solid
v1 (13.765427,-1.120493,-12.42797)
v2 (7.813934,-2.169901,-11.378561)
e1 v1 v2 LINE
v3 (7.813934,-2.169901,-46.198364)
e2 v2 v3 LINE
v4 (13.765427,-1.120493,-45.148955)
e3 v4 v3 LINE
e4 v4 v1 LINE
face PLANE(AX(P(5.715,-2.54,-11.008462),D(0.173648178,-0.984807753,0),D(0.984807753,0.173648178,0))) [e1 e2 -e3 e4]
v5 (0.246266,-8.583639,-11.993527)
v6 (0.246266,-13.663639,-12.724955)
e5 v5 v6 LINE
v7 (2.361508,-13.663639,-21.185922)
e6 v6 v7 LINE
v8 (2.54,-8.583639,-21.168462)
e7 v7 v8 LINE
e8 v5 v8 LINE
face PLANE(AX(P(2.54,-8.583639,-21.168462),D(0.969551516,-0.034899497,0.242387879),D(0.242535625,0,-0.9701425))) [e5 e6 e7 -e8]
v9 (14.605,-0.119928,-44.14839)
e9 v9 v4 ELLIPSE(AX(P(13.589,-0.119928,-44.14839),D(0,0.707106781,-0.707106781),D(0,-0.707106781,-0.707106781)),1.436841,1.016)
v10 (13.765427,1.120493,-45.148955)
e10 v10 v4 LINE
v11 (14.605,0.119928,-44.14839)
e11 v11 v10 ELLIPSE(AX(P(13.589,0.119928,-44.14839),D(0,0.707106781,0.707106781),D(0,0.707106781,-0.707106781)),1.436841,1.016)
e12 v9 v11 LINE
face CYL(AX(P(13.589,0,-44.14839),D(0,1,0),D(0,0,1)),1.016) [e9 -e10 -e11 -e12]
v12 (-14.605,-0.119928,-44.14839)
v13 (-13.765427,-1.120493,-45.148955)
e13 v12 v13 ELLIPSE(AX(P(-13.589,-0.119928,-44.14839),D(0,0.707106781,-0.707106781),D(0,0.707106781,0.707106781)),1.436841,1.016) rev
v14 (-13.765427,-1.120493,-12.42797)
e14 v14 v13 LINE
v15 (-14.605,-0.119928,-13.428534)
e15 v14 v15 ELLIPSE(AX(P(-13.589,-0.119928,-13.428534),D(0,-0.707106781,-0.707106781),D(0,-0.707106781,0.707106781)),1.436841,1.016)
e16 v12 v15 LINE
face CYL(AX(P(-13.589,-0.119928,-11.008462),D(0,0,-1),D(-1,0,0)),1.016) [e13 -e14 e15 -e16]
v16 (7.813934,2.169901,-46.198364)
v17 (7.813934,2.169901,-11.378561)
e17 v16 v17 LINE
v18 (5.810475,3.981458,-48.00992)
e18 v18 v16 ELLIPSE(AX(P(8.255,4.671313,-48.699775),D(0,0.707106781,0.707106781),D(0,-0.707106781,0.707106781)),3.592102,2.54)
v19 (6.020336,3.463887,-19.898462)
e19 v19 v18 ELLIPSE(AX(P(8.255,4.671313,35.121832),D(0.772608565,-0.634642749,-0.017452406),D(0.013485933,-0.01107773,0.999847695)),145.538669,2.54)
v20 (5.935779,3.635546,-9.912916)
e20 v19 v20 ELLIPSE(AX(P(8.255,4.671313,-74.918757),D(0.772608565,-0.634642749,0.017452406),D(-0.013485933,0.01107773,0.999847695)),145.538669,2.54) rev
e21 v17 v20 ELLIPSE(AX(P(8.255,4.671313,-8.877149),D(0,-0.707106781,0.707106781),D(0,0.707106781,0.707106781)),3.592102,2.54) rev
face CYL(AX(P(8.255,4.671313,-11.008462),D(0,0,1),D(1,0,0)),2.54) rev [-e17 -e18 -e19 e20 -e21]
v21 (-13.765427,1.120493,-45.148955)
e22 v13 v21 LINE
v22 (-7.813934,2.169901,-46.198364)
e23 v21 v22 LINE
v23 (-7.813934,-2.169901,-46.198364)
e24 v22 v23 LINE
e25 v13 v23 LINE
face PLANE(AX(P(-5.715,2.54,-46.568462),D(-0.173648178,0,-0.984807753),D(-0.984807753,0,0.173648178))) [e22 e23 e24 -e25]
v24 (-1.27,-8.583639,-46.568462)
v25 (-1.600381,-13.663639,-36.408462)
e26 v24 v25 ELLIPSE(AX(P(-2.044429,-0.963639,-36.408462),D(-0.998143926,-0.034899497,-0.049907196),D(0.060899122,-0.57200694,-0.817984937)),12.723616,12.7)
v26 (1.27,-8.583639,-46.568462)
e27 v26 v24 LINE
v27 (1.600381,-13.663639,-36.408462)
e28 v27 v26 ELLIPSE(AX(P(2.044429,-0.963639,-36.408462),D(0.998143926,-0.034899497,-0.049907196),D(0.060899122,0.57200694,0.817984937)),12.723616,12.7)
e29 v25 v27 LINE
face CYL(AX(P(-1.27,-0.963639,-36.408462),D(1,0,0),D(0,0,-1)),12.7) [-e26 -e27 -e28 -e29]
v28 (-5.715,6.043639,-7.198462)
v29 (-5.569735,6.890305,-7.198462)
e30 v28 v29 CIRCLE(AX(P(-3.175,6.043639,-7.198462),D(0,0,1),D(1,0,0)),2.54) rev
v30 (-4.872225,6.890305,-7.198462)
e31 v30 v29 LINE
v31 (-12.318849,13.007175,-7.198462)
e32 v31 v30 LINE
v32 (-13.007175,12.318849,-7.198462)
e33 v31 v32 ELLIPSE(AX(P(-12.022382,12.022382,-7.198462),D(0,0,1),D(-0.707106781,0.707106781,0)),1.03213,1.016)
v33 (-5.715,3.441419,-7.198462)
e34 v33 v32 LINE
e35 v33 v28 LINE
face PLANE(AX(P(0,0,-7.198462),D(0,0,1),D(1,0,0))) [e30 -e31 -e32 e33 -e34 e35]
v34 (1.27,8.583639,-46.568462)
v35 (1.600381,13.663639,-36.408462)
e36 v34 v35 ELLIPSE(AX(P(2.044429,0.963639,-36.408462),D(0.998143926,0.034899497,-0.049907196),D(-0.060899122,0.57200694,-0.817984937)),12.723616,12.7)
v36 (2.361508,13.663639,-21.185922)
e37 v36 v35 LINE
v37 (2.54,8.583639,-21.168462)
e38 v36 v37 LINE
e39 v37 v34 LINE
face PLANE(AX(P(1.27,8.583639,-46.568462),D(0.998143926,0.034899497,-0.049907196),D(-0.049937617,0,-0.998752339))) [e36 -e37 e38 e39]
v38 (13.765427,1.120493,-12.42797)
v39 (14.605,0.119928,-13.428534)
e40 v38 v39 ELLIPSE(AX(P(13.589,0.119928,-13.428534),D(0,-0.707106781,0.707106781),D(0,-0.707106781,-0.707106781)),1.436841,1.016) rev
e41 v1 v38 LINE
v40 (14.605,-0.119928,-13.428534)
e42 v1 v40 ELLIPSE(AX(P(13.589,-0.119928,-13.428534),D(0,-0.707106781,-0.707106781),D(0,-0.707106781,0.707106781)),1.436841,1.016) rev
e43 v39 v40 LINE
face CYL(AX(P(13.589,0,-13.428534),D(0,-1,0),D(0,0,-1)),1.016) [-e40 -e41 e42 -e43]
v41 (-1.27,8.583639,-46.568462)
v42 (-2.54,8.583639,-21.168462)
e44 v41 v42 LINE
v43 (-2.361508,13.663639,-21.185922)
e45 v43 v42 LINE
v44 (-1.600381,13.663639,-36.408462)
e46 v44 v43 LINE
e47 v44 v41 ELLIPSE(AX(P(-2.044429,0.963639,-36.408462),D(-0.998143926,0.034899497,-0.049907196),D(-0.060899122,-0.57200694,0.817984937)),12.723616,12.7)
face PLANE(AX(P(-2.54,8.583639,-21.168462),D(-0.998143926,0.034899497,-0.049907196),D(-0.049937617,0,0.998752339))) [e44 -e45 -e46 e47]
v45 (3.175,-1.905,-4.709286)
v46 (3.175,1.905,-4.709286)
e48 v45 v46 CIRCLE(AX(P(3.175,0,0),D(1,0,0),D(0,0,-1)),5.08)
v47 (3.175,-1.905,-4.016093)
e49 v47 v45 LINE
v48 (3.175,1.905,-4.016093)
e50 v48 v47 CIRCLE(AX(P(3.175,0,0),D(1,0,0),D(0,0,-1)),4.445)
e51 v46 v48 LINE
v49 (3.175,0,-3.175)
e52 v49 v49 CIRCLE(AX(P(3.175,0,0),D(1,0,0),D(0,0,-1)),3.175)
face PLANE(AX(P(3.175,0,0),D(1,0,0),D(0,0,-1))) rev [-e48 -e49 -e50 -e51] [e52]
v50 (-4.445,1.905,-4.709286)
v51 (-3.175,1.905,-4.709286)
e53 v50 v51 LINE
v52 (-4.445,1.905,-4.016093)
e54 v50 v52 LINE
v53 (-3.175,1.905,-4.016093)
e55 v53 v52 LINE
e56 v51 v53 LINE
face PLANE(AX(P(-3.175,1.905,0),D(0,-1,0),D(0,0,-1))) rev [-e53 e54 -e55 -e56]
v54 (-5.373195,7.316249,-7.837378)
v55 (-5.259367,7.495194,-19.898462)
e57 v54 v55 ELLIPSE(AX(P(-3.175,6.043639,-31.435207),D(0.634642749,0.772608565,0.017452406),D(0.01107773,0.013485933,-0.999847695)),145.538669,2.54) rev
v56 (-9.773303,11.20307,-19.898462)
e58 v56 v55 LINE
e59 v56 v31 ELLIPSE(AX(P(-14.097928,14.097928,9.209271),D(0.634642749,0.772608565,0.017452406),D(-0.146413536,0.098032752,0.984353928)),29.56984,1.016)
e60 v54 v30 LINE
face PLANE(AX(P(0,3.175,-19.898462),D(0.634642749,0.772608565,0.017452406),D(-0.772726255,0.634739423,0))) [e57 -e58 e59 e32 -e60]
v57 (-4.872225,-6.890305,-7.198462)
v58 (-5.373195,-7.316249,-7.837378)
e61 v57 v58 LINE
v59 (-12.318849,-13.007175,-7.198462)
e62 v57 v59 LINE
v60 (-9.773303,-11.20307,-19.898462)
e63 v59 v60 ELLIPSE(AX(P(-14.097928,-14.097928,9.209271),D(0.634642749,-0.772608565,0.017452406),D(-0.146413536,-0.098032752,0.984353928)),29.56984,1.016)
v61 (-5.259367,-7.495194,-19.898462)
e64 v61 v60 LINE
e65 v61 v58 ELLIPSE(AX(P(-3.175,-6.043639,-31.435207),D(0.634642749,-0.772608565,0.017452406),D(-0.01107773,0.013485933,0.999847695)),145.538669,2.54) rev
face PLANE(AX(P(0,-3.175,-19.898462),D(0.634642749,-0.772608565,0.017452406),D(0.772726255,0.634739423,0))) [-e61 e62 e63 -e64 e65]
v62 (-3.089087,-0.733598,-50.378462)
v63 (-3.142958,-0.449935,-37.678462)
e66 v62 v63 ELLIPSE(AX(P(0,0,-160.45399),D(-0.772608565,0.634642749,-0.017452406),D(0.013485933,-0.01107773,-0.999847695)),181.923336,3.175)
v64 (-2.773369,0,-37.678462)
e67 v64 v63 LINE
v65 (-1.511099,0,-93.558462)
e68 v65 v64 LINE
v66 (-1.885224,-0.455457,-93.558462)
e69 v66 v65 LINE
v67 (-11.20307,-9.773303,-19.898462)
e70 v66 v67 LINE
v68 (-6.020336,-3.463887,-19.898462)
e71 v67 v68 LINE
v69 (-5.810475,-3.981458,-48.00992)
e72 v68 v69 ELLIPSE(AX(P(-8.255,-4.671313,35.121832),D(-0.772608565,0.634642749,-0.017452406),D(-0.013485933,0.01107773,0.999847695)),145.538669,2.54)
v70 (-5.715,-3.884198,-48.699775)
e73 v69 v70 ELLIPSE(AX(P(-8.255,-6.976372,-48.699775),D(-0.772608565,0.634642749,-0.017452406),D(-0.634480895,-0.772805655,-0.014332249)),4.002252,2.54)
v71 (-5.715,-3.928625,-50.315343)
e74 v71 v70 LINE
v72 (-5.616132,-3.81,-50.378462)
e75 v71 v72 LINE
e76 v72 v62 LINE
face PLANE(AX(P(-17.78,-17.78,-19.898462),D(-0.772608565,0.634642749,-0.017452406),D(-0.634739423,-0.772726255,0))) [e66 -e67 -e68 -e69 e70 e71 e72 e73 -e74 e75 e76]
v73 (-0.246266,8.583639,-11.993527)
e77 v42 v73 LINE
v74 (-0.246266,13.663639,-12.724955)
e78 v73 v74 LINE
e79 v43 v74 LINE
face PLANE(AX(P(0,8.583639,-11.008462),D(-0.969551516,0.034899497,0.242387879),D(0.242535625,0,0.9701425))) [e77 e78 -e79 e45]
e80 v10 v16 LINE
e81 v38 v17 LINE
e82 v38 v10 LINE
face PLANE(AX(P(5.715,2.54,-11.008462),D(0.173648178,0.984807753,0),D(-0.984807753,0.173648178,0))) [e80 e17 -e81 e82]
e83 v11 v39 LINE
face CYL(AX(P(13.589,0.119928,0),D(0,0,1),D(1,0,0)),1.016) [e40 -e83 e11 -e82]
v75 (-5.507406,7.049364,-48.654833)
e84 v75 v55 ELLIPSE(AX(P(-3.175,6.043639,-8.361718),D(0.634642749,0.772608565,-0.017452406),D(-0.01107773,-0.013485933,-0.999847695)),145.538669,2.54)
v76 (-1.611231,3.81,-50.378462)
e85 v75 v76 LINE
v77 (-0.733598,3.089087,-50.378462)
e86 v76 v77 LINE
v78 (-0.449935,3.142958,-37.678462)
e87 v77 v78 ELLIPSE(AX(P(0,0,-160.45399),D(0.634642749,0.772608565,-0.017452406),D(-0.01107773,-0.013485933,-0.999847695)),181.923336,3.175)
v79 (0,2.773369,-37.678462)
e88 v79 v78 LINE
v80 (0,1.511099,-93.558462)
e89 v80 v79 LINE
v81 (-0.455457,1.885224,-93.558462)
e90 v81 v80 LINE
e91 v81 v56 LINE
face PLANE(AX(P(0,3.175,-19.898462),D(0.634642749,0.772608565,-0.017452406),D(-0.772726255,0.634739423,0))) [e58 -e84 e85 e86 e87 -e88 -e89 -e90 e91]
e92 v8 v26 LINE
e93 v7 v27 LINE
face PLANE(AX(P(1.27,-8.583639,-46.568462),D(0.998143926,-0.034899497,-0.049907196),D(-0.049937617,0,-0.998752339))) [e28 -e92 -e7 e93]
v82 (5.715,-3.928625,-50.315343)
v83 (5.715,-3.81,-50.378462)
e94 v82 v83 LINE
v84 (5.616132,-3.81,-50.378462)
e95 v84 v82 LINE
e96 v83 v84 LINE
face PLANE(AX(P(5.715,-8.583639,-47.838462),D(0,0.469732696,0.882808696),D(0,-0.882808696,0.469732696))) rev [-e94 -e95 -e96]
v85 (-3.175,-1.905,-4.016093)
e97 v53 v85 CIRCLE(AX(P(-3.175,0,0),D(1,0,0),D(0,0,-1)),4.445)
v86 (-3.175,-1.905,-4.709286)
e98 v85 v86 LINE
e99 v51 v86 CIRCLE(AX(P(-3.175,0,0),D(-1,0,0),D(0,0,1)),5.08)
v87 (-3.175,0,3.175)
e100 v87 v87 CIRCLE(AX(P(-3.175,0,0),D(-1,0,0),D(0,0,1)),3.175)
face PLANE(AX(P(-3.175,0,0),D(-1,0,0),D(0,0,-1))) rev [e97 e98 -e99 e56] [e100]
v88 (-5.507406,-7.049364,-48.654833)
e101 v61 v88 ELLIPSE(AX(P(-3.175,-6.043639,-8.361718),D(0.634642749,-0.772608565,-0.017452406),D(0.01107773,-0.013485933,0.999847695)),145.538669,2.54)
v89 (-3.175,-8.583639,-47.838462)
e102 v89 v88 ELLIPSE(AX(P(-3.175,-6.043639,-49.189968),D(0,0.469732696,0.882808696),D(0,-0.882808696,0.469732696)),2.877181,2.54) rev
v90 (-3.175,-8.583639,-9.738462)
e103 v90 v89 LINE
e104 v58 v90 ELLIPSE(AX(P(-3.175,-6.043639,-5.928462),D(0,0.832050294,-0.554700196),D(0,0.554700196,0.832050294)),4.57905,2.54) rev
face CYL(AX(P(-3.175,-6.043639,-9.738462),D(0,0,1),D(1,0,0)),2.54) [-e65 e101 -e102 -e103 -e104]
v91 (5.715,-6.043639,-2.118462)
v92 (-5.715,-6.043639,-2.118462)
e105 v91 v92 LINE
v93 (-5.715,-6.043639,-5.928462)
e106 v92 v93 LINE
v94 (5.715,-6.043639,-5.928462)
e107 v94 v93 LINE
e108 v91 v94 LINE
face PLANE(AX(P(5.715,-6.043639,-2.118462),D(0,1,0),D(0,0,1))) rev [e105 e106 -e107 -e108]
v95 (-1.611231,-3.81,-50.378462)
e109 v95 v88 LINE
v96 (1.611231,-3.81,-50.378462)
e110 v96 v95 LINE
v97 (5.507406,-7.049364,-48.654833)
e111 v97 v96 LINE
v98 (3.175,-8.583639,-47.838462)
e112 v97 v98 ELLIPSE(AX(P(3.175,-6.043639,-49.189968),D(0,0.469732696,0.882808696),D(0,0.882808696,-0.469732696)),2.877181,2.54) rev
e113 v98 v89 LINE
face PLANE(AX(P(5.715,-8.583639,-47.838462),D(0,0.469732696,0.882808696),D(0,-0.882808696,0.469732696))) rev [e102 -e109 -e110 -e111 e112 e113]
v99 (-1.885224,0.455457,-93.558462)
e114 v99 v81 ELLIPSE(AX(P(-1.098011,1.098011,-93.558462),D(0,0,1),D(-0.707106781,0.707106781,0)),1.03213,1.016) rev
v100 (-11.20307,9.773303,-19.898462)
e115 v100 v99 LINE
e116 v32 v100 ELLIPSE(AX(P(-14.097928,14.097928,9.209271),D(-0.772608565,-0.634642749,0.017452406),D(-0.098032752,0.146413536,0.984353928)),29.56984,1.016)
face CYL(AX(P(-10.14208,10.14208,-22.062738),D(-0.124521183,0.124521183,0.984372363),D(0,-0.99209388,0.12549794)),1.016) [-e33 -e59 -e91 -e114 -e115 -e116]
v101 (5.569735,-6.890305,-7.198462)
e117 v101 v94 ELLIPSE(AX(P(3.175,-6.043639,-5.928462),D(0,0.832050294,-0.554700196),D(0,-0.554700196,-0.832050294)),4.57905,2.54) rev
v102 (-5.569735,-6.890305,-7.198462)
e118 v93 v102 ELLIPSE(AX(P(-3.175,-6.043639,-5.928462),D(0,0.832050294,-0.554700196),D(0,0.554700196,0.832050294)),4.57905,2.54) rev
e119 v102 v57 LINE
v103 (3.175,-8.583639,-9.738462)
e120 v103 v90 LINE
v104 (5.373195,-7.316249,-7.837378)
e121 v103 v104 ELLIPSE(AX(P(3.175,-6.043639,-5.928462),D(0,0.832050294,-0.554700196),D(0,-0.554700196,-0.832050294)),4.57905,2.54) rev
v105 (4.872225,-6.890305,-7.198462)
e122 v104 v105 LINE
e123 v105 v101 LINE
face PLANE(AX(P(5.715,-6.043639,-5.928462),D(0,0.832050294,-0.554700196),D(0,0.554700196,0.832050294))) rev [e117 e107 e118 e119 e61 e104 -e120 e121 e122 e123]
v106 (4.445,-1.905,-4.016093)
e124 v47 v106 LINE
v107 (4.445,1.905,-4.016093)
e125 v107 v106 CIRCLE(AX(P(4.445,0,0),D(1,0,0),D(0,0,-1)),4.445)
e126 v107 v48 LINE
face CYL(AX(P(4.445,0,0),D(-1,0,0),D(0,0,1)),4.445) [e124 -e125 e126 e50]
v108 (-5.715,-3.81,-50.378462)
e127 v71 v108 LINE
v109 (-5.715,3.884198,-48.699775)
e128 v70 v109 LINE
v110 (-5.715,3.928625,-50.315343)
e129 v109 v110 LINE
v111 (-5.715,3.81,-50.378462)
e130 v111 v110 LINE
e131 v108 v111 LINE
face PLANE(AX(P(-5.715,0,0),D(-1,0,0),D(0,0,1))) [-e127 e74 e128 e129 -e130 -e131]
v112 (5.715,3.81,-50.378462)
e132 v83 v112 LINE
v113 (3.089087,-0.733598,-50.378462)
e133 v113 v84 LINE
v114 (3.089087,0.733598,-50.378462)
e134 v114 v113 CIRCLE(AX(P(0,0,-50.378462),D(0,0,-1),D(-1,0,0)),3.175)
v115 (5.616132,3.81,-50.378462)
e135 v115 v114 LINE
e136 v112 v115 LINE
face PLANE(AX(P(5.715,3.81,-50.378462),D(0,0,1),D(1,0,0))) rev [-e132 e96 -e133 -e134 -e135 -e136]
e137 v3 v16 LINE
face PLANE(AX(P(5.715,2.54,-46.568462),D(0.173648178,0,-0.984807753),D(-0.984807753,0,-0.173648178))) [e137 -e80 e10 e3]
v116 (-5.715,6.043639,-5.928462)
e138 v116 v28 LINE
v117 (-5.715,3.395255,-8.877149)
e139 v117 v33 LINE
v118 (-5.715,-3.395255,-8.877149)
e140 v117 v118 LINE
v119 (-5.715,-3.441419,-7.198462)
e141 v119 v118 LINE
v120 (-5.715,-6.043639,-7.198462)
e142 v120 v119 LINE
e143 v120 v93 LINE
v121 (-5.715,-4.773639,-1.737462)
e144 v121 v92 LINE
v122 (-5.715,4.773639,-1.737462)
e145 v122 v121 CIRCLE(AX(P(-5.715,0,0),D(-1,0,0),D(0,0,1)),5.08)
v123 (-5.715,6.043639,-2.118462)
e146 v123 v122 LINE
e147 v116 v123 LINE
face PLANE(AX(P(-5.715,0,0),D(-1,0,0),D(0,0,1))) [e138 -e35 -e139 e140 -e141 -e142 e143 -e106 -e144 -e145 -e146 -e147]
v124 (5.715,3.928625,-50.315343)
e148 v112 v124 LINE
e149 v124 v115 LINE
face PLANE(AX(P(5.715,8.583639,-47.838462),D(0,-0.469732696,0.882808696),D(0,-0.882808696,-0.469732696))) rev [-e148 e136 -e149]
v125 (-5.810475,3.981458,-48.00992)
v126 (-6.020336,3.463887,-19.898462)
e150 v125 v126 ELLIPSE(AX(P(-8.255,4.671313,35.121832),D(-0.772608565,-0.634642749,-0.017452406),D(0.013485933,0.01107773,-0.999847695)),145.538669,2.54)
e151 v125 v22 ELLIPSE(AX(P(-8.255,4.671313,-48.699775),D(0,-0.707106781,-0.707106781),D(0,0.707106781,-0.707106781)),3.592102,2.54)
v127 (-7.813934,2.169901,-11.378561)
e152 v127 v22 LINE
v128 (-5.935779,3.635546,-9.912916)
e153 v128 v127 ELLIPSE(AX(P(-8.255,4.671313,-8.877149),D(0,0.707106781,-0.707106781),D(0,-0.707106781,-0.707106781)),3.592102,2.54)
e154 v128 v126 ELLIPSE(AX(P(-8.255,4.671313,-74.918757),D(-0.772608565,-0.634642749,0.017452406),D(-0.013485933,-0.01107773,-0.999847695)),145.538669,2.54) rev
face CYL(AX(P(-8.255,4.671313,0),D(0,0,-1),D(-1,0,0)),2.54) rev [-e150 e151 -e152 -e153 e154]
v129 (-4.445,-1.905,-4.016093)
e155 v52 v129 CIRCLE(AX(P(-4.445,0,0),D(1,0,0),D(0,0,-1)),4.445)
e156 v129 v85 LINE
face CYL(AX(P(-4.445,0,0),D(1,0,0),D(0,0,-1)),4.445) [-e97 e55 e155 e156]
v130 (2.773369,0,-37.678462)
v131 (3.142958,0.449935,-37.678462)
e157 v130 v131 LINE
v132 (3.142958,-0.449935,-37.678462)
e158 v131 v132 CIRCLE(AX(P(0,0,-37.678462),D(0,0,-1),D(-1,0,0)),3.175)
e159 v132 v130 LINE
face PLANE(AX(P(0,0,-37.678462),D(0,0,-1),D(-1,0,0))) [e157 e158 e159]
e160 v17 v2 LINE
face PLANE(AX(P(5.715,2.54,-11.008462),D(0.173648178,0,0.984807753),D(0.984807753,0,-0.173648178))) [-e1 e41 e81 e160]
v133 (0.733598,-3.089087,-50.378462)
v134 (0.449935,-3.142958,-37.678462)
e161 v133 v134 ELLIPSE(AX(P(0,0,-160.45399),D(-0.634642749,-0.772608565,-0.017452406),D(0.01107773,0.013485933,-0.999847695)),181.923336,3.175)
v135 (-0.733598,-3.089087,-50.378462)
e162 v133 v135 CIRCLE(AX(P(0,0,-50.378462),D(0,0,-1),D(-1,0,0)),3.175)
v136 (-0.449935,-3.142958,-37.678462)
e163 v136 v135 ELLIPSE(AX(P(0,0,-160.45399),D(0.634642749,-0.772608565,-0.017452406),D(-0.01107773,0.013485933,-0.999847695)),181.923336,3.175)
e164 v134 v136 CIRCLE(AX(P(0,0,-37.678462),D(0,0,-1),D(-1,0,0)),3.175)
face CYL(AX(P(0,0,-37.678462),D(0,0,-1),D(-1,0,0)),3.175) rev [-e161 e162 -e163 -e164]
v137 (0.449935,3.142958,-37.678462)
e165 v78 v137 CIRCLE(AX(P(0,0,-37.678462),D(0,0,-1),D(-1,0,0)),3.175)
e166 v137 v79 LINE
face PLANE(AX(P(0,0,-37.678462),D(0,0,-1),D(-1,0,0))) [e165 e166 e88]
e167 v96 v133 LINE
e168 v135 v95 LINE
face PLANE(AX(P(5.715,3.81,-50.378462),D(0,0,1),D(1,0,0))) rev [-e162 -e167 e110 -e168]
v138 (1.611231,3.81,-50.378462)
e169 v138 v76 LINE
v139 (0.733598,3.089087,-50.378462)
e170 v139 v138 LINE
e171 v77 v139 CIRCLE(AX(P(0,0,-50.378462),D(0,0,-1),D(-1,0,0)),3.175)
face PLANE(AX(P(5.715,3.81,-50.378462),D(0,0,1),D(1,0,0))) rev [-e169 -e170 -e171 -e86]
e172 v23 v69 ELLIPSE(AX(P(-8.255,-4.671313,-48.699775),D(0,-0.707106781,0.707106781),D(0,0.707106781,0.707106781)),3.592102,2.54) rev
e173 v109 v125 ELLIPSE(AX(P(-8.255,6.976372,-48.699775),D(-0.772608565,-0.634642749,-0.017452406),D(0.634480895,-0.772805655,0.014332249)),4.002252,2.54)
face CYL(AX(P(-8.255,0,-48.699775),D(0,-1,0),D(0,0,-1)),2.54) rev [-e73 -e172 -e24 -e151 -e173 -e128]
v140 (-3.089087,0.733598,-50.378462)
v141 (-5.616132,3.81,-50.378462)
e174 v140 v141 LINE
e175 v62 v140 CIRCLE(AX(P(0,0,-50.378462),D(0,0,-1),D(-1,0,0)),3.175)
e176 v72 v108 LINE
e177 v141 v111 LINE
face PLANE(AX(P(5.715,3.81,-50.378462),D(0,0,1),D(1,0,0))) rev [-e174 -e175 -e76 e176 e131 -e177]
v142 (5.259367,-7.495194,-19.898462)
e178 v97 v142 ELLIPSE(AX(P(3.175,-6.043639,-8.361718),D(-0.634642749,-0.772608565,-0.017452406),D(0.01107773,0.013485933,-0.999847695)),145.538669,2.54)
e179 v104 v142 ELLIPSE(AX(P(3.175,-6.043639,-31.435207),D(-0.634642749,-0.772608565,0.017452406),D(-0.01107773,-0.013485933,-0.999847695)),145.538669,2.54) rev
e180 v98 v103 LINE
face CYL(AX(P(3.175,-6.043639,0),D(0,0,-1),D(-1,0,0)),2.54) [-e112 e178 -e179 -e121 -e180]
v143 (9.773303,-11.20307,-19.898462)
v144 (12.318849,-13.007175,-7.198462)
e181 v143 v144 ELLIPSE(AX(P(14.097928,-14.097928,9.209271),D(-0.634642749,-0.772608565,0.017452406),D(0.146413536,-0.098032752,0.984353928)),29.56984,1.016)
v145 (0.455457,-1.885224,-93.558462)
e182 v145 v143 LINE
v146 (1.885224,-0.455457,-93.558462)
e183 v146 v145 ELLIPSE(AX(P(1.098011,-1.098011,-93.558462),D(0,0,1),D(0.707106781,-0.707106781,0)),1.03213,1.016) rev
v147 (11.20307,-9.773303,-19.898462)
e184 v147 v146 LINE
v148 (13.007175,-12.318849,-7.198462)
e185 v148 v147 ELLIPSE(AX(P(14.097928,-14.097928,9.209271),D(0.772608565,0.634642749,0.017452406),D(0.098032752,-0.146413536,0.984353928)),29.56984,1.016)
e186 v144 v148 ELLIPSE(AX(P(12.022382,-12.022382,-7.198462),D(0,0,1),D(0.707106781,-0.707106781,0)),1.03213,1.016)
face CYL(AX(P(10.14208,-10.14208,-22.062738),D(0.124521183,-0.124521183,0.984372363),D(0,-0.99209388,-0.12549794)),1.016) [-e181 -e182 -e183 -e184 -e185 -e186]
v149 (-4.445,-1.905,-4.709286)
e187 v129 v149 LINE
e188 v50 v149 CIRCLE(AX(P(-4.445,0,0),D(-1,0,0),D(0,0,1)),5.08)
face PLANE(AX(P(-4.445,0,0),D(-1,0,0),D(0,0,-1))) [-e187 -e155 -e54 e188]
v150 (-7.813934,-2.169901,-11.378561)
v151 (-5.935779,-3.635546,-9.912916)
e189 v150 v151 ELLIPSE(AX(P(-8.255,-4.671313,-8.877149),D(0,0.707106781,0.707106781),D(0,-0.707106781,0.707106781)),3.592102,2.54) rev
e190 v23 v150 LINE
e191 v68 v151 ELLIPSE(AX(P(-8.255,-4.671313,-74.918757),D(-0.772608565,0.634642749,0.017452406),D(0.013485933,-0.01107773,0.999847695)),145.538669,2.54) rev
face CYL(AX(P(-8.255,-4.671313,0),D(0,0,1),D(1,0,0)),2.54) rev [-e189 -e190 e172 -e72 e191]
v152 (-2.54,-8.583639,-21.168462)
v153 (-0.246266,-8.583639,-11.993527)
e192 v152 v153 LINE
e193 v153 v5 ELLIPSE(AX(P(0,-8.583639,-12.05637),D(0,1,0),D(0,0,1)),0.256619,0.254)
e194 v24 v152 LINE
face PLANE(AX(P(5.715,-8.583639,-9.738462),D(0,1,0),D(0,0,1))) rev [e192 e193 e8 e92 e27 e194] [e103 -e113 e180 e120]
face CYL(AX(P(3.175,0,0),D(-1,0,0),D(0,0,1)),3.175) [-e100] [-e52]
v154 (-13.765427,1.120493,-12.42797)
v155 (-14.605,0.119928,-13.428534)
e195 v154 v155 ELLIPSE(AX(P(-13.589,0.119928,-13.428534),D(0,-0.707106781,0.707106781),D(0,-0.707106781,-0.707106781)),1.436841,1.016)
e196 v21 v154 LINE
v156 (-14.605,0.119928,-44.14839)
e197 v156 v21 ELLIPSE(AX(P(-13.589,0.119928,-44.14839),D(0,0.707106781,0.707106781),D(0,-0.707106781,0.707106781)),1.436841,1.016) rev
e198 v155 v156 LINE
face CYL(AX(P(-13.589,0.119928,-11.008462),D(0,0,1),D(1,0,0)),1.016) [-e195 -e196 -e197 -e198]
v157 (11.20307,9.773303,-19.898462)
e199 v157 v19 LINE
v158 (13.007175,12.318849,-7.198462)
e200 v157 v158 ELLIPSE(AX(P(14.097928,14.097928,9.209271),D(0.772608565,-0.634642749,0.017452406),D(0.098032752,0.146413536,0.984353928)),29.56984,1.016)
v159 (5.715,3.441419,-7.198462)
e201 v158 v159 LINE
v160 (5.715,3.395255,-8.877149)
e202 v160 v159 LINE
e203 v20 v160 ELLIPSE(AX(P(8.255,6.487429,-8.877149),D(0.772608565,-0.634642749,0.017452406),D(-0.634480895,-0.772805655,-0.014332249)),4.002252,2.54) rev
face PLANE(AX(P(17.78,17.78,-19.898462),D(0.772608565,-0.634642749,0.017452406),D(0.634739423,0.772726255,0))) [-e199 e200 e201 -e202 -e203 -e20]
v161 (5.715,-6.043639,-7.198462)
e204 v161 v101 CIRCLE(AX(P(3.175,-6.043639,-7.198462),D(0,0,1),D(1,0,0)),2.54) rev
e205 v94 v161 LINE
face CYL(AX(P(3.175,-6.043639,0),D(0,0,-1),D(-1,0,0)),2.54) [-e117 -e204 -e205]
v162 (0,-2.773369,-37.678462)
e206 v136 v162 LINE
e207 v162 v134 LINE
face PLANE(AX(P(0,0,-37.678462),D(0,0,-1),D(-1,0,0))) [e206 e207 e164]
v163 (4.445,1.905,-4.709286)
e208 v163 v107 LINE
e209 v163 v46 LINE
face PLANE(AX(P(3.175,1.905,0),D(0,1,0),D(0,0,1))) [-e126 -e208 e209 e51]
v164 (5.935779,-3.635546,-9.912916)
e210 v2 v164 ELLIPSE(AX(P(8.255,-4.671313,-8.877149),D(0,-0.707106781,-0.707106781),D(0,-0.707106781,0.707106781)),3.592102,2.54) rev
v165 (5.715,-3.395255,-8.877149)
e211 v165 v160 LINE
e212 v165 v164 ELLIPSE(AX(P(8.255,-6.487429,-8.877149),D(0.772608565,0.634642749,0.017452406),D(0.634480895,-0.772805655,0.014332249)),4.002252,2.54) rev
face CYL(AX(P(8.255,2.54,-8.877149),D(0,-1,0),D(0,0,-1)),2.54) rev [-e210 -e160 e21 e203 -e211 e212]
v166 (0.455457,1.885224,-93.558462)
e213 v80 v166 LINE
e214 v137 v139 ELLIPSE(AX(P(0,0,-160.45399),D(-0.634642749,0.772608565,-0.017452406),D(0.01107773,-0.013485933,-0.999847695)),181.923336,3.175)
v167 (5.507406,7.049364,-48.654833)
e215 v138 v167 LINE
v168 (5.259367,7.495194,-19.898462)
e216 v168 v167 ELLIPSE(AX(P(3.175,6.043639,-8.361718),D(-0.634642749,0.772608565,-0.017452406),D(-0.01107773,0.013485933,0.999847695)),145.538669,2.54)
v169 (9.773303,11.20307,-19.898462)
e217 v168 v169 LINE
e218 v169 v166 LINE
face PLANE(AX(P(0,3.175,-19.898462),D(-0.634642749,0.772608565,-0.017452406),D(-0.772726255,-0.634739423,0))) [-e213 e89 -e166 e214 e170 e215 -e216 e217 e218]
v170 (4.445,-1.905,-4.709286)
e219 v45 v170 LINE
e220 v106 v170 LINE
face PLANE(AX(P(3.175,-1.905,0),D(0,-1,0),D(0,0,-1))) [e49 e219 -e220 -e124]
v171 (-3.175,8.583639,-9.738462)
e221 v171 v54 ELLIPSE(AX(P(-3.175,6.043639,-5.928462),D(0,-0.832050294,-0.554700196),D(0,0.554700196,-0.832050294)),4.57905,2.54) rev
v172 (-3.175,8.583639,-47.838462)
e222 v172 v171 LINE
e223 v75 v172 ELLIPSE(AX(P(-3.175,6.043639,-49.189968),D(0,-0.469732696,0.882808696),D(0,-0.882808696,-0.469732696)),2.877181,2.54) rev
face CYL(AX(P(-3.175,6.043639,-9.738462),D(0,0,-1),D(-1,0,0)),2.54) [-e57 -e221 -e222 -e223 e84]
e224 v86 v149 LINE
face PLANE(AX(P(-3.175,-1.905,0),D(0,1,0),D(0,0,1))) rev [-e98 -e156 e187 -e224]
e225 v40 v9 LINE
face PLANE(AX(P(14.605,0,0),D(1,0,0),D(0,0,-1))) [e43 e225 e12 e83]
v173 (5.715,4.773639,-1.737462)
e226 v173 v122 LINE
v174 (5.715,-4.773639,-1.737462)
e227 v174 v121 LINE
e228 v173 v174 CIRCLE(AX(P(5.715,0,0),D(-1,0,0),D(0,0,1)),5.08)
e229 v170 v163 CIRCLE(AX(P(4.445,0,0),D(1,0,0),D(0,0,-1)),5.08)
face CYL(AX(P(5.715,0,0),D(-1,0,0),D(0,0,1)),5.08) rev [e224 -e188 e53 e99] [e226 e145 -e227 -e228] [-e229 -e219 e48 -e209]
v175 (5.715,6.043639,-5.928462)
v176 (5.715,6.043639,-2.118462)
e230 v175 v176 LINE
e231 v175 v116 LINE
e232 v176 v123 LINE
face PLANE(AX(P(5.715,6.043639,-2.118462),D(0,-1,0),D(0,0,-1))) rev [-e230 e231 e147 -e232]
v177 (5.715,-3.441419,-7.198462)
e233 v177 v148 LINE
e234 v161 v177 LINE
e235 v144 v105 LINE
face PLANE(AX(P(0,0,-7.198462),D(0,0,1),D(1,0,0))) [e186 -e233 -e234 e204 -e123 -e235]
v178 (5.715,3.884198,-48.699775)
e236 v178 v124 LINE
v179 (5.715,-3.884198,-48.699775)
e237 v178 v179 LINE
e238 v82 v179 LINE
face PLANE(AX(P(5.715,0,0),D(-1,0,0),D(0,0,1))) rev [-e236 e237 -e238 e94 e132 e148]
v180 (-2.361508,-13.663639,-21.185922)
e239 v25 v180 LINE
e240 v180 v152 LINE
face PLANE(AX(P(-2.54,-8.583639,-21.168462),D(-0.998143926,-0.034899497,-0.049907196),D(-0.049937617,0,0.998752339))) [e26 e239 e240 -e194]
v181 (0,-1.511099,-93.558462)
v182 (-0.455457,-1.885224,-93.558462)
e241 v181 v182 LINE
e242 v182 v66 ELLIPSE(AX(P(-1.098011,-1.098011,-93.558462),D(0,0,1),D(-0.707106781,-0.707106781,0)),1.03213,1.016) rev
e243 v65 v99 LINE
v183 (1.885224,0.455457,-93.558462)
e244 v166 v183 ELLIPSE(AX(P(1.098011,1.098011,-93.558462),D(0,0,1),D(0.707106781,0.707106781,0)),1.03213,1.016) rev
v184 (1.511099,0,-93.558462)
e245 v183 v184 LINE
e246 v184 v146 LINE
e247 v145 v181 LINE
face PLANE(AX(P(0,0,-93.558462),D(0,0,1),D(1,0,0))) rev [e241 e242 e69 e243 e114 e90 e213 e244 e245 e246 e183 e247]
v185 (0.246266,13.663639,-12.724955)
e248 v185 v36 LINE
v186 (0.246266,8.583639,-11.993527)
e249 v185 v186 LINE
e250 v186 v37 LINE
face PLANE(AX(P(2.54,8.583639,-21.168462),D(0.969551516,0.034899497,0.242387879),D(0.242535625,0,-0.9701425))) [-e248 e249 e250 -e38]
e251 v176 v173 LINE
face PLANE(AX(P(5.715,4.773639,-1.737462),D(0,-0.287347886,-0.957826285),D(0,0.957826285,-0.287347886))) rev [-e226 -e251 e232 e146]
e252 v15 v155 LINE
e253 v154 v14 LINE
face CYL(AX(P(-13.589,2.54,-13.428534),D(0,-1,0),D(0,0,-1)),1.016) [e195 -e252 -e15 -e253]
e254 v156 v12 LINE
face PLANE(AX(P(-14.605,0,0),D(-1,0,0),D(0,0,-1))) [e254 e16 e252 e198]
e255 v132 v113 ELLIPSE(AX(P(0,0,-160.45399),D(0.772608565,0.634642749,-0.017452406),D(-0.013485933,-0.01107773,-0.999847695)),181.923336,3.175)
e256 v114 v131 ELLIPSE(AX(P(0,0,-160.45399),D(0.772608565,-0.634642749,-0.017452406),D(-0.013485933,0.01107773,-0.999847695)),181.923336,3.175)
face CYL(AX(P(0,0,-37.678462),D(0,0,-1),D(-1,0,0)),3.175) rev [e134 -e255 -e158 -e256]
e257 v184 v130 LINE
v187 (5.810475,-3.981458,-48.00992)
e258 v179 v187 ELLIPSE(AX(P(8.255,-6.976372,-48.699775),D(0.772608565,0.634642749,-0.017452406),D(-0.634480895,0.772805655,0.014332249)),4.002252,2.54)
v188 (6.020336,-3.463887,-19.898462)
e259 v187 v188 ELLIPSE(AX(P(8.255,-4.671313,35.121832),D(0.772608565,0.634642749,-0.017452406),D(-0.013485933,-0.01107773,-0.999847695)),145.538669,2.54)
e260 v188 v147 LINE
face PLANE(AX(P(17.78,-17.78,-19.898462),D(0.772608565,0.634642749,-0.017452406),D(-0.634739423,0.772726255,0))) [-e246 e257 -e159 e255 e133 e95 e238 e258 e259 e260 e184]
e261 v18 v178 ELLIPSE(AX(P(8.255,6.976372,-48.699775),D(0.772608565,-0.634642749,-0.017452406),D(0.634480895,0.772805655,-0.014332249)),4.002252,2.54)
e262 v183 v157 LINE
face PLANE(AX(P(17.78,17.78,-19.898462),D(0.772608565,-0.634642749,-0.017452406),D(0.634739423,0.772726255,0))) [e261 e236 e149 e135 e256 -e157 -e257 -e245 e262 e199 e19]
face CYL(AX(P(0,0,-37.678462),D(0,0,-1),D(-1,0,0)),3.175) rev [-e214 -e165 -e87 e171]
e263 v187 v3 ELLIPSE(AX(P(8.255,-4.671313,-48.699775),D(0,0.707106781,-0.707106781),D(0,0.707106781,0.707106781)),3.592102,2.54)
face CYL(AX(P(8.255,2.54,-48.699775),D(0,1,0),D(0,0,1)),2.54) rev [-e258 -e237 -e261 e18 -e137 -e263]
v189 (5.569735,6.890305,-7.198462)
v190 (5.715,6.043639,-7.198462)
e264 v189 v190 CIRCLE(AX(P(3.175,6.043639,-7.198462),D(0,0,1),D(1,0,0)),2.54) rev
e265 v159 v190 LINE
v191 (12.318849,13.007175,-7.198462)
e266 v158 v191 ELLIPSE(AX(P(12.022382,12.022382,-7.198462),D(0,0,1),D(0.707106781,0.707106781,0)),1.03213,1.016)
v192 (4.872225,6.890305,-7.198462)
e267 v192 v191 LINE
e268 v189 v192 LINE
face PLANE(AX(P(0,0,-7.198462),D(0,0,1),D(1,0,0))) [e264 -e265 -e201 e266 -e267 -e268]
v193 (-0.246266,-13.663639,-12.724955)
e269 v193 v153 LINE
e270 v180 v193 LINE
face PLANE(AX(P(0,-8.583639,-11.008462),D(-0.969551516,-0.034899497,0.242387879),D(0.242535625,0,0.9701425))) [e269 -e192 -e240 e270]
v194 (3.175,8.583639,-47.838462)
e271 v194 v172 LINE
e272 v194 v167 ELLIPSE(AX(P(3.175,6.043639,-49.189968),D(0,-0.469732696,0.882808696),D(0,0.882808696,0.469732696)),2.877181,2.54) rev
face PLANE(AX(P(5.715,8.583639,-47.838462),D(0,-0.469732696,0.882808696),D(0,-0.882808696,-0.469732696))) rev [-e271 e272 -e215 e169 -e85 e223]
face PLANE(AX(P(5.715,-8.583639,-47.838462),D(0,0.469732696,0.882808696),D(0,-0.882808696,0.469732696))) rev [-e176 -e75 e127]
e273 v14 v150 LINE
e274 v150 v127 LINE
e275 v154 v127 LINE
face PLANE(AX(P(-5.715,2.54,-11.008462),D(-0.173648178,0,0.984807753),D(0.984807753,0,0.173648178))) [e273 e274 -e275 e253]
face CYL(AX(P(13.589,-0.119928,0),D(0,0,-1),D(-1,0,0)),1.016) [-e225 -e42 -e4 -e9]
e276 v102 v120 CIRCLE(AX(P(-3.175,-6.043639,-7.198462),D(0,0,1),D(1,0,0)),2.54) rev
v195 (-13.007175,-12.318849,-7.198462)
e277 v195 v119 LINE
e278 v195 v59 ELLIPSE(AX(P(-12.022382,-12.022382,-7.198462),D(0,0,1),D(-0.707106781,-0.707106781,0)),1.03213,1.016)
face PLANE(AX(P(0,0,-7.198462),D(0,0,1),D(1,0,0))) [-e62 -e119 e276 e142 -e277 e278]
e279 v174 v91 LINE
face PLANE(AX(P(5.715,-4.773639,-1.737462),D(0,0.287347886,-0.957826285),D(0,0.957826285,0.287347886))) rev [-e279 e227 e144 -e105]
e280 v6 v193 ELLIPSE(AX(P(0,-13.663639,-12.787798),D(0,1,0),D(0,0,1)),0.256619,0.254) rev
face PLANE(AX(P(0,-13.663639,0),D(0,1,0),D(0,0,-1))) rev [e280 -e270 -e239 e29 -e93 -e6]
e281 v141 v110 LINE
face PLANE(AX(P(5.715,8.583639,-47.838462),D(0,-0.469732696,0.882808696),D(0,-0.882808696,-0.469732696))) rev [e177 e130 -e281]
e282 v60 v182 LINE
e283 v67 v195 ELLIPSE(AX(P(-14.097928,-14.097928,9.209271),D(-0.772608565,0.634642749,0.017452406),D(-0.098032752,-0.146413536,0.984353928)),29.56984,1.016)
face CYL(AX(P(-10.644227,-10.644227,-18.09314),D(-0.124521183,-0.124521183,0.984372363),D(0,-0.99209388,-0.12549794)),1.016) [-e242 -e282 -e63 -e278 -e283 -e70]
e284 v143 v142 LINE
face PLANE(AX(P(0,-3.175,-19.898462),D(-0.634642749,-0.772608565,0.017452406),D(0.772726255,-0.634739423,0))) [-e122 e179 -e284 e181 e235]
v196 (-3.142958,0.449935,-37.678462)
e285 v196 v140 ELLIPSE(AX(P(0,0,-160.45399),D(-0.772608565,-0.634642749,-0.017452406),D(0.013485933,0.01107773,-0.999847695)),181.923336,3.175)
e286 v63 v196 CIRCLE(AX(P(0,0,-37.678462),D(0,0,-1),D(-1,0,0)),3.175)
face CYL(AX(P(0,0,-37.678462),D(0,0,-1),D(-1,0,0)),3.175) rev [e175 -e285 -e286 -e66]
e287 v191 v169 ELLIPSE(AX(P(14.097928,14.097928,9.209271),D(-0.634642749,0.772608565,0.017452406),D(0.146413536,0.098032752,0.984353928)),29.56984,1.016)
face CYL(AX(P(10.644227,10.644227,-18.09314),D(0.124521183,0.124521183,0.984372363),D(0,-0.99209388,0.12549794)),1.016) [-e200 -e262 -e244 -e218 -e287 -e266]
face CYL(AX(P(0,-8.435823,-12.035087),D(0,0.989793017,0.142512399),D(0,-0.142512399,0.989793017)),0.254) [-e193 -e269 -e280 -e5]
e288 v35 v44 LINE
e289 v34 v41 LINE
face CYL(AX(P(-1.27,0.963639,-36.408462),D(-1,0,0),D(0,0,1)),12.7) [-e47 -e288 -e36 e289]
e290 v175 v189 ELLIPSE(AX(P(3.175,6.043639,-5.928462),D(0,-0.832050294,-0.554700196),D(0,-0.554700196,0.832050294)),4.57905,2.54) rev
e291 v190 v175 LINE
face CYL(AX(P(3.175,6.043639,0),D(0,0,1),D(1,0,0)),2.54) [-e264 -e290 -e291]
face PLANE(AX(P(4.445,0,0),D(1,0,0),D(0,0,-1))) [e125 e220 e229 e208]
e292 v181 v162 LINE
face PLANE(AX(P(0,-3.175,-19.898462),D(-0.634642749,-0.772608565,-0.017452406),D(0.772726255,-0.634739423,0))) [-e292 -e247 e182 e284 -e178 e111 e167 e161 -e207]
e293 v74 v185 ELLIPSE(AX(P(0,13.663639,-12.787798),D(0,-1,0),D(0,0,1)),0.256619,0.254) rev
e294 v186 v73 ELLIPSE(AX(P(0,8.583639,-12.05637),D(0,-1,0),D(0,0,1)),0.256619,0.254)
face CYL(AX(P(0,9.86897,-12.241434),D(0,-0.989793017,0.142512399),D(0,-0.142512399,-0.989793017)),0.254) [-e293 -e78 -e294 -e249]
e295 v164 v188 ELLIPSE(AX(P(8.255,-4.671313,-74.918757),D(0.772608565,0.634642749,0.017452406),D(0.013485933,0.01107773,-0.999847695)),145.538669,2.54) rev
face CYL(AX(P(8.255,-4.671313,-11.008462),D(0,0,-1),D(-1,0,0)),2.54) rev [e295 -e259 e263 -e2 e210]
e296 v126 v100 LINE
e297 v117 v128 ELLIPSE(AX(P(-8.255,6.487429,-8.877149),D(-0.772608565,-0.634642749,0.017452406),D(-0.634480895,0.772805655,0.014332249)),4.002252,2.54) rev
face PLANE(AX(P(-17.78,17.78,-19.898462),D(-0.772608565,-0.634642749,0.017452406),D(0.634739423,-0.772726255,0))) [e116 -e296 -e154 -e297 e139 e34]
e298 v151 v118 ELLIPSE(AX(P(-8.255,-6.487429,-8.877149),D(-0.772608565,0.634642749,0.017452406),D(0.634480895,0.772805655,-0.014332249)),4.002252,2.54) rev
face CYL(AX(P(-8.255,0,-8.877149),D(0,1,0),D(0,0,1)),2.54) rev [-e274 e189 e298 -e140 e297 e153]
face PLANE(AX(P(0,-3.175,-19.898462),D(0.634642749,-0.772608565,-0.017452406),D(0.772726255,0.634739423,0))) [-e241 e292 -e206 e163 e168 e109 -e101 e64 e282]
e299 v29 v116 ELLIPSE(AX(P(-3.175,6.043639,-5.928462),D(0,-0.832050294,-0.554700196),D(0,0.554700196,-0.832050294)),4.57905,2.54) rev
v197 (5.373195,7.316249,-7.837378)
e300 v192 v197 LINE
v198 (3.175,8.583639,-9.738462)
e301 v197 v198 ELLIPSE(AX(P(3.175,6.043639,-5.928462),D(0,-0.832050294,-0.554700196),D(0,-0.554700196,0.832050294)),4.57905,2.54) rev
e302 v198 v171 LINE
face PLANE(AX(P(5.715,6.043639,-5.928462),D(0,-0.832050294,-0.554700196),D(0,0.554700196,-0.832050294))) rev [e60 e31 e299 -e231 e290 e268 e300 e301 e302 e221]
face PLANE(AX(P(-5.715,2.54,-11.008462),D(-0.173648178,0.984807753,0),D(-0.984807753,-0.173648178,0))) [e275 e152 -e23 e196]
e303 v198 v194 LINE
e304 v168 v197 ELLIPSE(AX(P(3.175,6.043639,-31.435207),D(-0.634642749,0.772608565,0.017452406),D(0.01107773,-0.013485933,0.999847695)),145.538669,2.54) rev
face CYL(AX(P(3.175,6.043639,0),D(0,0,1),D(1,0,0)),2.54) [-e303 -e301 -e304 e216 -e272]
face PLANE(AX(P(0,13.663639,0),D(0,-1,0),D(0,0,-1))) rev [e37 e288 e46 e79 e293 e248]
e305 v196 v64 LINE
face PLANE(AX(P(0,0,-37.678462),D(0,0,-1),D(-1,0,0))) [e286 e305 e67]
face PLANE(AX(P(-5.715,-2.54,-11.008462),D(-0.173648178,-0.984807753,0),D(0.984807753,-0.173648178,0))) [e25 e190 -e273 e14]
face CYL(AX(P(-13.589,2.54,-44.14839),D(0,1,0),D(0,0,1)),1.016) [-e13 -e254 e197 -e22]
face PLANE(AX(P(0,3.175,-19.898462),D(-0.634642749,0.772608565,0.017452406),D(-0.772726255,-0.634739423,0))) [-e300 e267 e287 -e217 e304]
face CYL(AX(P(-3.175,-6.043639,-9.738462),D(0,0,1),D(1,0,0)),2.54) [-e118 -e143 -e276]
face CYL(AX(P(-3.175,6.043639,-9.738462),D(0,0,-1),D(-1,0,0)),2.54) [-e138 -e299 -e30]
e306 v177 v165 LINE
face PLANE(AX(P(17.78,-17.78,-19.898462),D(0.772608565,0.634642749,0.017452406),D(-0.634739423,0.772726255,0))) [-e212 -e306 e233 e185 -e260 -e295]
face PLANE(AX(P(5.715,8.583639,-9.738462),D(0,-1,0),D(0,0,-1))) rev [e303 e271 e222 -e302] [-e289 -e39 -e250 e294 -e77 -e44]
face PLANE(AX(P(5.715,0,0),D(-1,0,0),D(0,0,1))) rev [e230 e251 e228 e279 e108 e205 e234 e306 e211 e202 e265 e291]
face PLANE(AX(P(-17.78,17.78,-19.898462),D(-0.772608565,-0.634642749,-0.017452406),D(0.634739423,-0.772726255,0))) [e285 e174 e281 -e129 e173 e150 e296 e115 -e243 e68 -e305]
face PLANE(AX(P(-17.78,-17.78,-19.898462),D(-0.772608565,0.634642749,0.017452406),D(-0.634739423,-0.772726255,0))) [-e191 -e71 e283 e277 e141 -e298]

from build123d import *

# Parameters (mm, degrees)
SKETCH1_R                     = 3.175
BOSS_EXTRUDE1_DEPTH           = 3.175
SKETCH2_R                     = 4.444999999999999
BOSS_EXTRUDE2_DEPTH           = 1.27
BOSS_EXTRUDE3_DEPTH           = 1.27
BOSS_EXTRUDE4_DEPTH           = 8.89
BOSS_EXTRUDE4_DEPTH_BACK      = 2.54
SKETCH5_R                     = 3.175
CUT_EXTRUDE1_DEPTH            = 12.7
FILLET1_R                     = 2.54
SKETCH6_W                     = 35.559999999999995
SKETCH6_H                     = 5.08
BOSS_EXTRUDE5_DEPTH           = 8.889999999999999
BOSS_EXTRUDE5_TAPER           = 10.000000000000021
FILLET2_R                     = 1.016
FILLET3_R                     = 2.54
BOSS_EXTRUDE6_DEPTH           = 5.079999999999994
BOSS_EXTRUDE6_TAPER           = 2.000000000000002
FILLET4_R                     = 0.254
FILLET5_R                     = 12.7
BOSS_EXTRUDE7_DEPTH           = 73.66
BOSS_EXTRUDE7_TAPER           = 1.0000000000000022
BOSS_EXTRUDE7_OTHER_WAY_DEPTH = 12.700000000000001
BOSS_EXTRUDE7_OTHER_WAY_TAPER = 1.0000000000000022
FILLET6_R                     = 1.016


with BuildPart() as part:
    # Sketch1 → Boss-Extrude1 (new, symmetric)
    with BuildSketch(Plane(origin=(0, 0, 0), x_dir=(0, 0, -1), z_dir=(1, 0, 0))):
        Circle(SKETCH1_R)
    extrude(amount=BOSS_EXTRUDE1_DEPTH, both=True)

    # Sketch2 → Boss-Extrude2 (add)
    with BuildSketch(Plane(origin=(3.175, 0, 0), x_dir=(0, 0, -1), z_dir=(1, 0, 0))):
        Circle(SKETCH2_R)
    boss_extrude2 = extrude(amount=BOSS_EXTRUDE2_DEPTH)

    # Mirror1: Boss-Extrude2 across plane
    add(boss_extrude2.mirror(Plane(origin=(0, 0, 0), x_dir=(0, 0, 1), z_dir=(1, 0, 0))))

    # Sketch3 → Boss-Extrude3 (add)
    with BuildSketch(Plane(origin=(4.445, 0, 0), x_dir=(0, 0, -1), z_dir=(1, 0, 0))):
        Polygon((-7.3e-16, 1.9049999999999998), (6.349999999999998, 1.9050000000000038), (6.349999999999999, -1.9049999999999998), (4.4e-16, -1.9049999999999998), align=None)
    boss_extrude3 = extrude(amount=-BOSS_EXTRUDE3_DEPTH)

    # Mirror2: Boss-Extrude3 across plane
    add(boss_extrude3.mirror(Plane(origin=(0, 0, 0), x_dir=(0, 0, 1), z_dir=(1, 0, 0))))

    # Sketch4 → Boss-Extrude4 (add, two sides: drawn at the far end of the back side and taken through both)
    with BuildSketch(Plane(origin=(-3.175, 0, 0), x_dir=(0, 0, -1), z_dir=(1, 0, 0)).offset(-BOSS_EXTRUDE4_DEPTH_BACK)):
        with BuildLine():
            Line((1.7374623280944008, 4.773638513592414), (2.1184623280943997, 6.0436385135924136))
            Line((2.1184623280943997, 6.0436385135924136), (5.928462328094399, 6.0436385135924136))
            Line((5.928462328094399, 6.0436385135924136), (9.738462328094398, 8.583638513592414))
            Line((9.738462328094398, 8.583638513592414), (47.838462328094394, 8.583638513592414))
            Line((47.838462328094394, 8.583638513592414), (50.3784623280944, 3.8099999999999996))
            Line((50.3784623280944, 3.8099999999999996), (50.3784623280944, -3.8099999999999996))
            Line((50.3784623280944, -3.8099999999999996), (47.838462328094394, -8.583638513592414))
            Line((47.838462328094394, -8.583638513592414), (9.738462328094398, -8.583638513592414))
            Line((9.738462328094398, -8.583638513592414), (5.928462328094399, -6.0436385135924136))
            Line((5.928462328094399, -6.0436385135924136), (2.1184623280943997, -6.0436385135924136))
            Line((2.1184623280943997, -6.0436385135924136), (1.7374623280944008, -4.773638513592414))
            ThreePointArc((1.7374623280944008, -4.773638513592414), (5.080000000000001, 0), (1.7374623280944008, 4.773638513592414))
        make_face()
    extrude(amount=BOSS_EXTRUDE4_DEPTH + BOSS_EXTRUDE4_DEPTH_BACK)

    # Sketch5 → Cut-Extrude1 (cut)
    with BuildSketch(Plane(origin=(0, 0, -50.3784623280944), x_dir=(-1, 0, 0), z_dir=(0, 0, -1))):
        Circle(SKETCH5_R)
    extrude(amount=-CUT_EXTRUDE1_DEPTH, mode=Mode.SUBTRACT)

    # Fillet1
    fillet1_edges = [part.edges().sort_by_distance(p)[0] for p in [
        (5.715000000000001, -8.583638513592414, -28.788462328094397),
        (-5.715, -8.583638513592414, -28.788462328094397),
        (-5.715, 8.583638513592414, -28.788462328094397),
        (5.715000000000001, 8.583638513592414, -28.788462328094397),
    ]]
    fillet(fillet1_edges, radius=FILLET1_R)

    # Sketch6 → Boss-Extrude5 (add)
    with BuildSketch(Plane(origin=(5.715000000000001, 0, 0), x_dir=(0, 0, -1), z_dir=(1, 0, 0))):
        with Locations((28.7884623280944, 0)):
            Rectangle(SKETCH6_W, SKETCH6_H)
    boss_extrude5 = extrude(amount=BOSS_EXTRUDE5_DEPTH, taper=BOSS_EXTRUDE5_TAPER)

    # Mirror3: Boss-Extrude5 across plane
    add(boss_extrude5.mirror(Plane(origin=(0, 0, 0), x_dir=(0, 0, 1), z_dir=(1, 0, 0))))

    # Fillet2
    fillet2_edges = [part.edges().sort_by_distance(p)[0] for p in [
        (14.605, -1.6e-16, -12.57600918659266),
        (14.605, -0.9724531415017433, -28.788462328094404),
        (14.605, -1.6e-16, -45.00091546959614),
        (14.605, 0.9724531415017431, -28.788462328094397),
        (-14.605, -1.6e-16, -12.57600918659266),
        (-14.605, 0.9724531415017431, -28.788462328094397),
        (-14.605, -1.6e-16, -45.00091546959614),
        (-14.605, -0.9724531415017433, -28.788462328094404),
    ]]
    fillet(fillet2_edges, radius=FILLET2_R)

    # Fillet3
    fillet3_edges = [part.edges().sort_by_distance(p)[0] for p in [
        (5.715000000000001, 0, -11.008462328094403),
        (5.715000000000001, -2.54, -28.7884623280944),
        (5.715000000000001, 0, -46.5684623280944),
        (5.715000000000001, 2.54, -28.7884623280944),
        (-5.715000000000001, 0, -11.008462328094403),
        (-5.715000000000001, -2.54, -28.7884623280944),
        (-5.715000000000001, 0, -46.5684623280944),
        (-5.715000000000001, 2.54, -28.7884623280944),
    ]]
    fillet(fillet3_edges, radius=FILLET3_R)

    # Sketch7 → Boss-Extrude6 (add)
    with BuildSketch(Plane(origin=(0, 8.583638513592414, 0), x_dir=(1, 0, 0), z_dir=(0, 1, 0))):
        Polygon((-1.27, 46.568462328094405), (-2.5399999999999983, 21.168462328094403), (0, 11.0084623280944), (2.5399999999999983, 21.168462328094403), (1.27, 46.568462328094405), align=None)
    boss_extrude6 = extrude(amount=BOSS_EXTRUDE6_DEPTH, taper=BOSS_EXTRUDE6_TAPER)

    # Mirror4: Boss-Extrude6 across plane
    add(boss_extrude6.mirror(Plane.ZX))

    # Fillet4
    fillet4_edges = [part.edges().sort_by_distance(p)[0] for p in [
        (0, 11.123638513592411, -11.3741766617959),
        (0, -11.123638513592411, -11.3741766617959),
    ]]
    fillet(fillet4_edges, radius=FILLET4_R)

    # Fillet5
    # the kernel refuses this fillet: 12.7 mm, written as the material it takes off along each edge
    with BuildSketch(Plane(origin=(26.057756985420163, -13.663638513592407, -46.39106481907633), x_dir=(0, 0.9993908270190958, -0.03489949670250099), z_dir=(-1, 0, 0))) as fillet5_piece_1:
        with BuildLine():
            CenterArc((12.343875700426112, -10.419744967387068), FILLET5_R, 124.86989764584403, 53.130102354155966)
            Line((-0.34838780271640163, -9.976521359265305), (-0.6022330727792515, -9.96765688710287))
            Line((-0.6022330727792515, -9.96765688710287), (-0.2538452700628499, 0.00886447216243524))
            Line((-0.2538452700628499, 0.00886447216243524), (6.6e-16, 0.2539999999999965))
            ThreePointArc((6.6e-16, 0.2539999999999965), (2.5415482425190037, 0.25399999999999656), (4.9378809007302475, 0.2083948993477439))
            Line((4.9378809007302475, 0.2083948993477439), (5.083096485038009, 0))
        make_face()
    extrude(amount=52.11551397084032, mode=Mode.SUBTRACT)
    with BuildSketch(Plane(origin=(26.057756985420163, 13.663638513592407, -46.39106481907633), x_dir=(0, -0.9993908270190958, -0.03489949670250099), z_dir=(-1, 0, 0))) as fillet5_piece_2:
        with BuildLine():
            CenterArc((12.343875700426112, 10.419744967387068), FILLET5_R, 182, 53.13010235415595)
            Line((-0.34838780271640163, 9.976521359265305), (-0.6022330727792515, 9.96765688710287))
            Line((-0.6022330727792515, 9.96765688710287), (-0.2538452700628499, -0.00886447216243524))
            Line((-0.2538452700628499, -0.00886447216243524), (6.6e-16, -0.2539999999999965))
            ThreePointArc((6.6e-16, -0.2539999999999965), (2.5415482425190037, -0.25399999999999656), (4.9378809007302475, -0.2083948993477439))
            Line((4.9378809007302475, -0.2083948993477439), (5.083096485038009, 0))
        make_face()
    extrude(amount=52.11551397084032, mode=Mode.SUBTRACT)

    # Sketch8 → Boss-Extrude7 (add)
    with BuildSketch(Plane(origin=(0, 0, -19.8984623280944), x_dir=(-1, 0, 0), z_dir=(0, 0, -1))):
        Polygon((0, 3.175), (-17.779999999999934, 17.779999999999987), (-3.175, -2e-16), (-17.779999999999934, -17.779999999999987), (0, -3.175), (17.779999999999934, -17.78), (3.175, 0), (17.779999999999934, 17.78), align=None)
    extrude(amount=BOSS_EXTRUDE7_DEPTH, taper=BOSS_EXTRUDE7_TAPER)

    # Sketch8 → Boss-Extrude7 other way (add)
    with BuildSketch(Plane(origin=(0, 0, -19.8984623280944), x_dir=(-1, 0, 0), z_dir=(0, 0, -1))):
        Polygon((0, 3.175), (-17.779999999999934, 17.779999999999987), (-3.175, -2e-16), (-17.779999999999934, -17.779999999999987), (0, -3.175), (17.779999999999934, -17.78), (3.175, 0), (17.779999999999934, 17.78), align=None)
    extrude(amount=-BOSS_EXTRUDE7_OTHER_WAY_DEPTH, taper=BOSS_EXTRUDE7_OTHER_WAY_TAPER)

    # Fillet6
    # the kernel refuses this fillet: 1.016 mm, written as the material it takes off along each edge
    with BuildSketch(Plane(origin=(-20.95567858297953, -20.95567858297961, 5.206103382012049), x_dir=(0.7627077129659504, 0.622551588883571, 0.17523259902424146), z_dir=(0.12452118344129766, 0.12452118344129816, -0.984372363360917))) as fillet6_piece_1:
        with BuildLine():
            CenterArc((FILLET6_R * 10.0405981063, -FILLET6_R), FILLET6_R, 90.0000000000001, 168.62469070380405)
            Line((FILLET6_R * 9.84336321649, -FILLET6_R * 1.98035626088), (0, 0))
            Line((0, 0), (FILLET6_R * 10.0405981063, 3e-17))
        make_face()
    extrude(amount=125.83564515900238, mode=Mode.SUBTRACT)
    with BuildSketch(Plane(origin=(-20.95567858297728, 20.955678582977363, 5.2061033819942395), x_dir=(0.7627077129659501, -0.6225515888835714, 0.17523259902424151), z_dir=(0.12452118344129769, -0.12452118344129823, -0.984372363360917))) as fillet6_piece_2:
        with BuildLine():
            CenterArc((FILLET6_R * 10.0405981063, FILLET6_R), FILLET6_R, 101.37530929619633, 168.62469070380357)
            Line((FILLET6_R * 9.84336321649, FILLET6_R * 1.98035626088), (0, 0))
            Line((0, 0), (FILLET6_R * 10.0405981063, 7e-17))
        make_face()
    extrude(amount=125.8356451589662, mode=Mode.SUBTRACT)
    with BuildSketch(Plane(origin=(20.955678582977644, -20.955678582977715, 5.2061033819972735), x_dir=(-0.6225515888835683, 0.7627077129659525, 0.1752325990242418), z_dir=(-0.1245211834412979, 0.1245211834412984, -0.984372363360917))) as fillet6_piece_3:
        with BuildLine():
            CenterArc((FILLET6_R * 10.0405981063, -FILLET6_R), FILLET6_R, 90, 168.62469070380405)
            Line((FILLET6_R * 9.84336321649, -FILLET6_R * 1.98035626088), (0, 0))
            Line((0, 0), (FILLET6_R * 10.0405981063, 8.1e-16))
        make_face()
    extrude(amount=125.83564515897237, mode=Mode.SUBTRACT)
    with BuildSketch(Plane(origin=(20.955678582978695, 20.95567858297876, 5.2061033820054945), x_dir=(-0.7627077129659505, -0.6225515888835708, 0.17523259902424118), z_dir=(-0.12452118344129749, -0.12452118344129792, -0.984372363360917))) as fillet6_piece_4:
        with BuildLine():
            CenterArc((FILLET6_R * 10.0405981063, -FILLET6_R), FILLET6_R, 90, 168.62469070380394)
            Line((FILLET6_R * 9.84336321649, -FILLET6_R * 1.98035626088), (0, 0))
            Line((0, 0), (FILLET6_R * 10.0405981063, -1.51e-15))
        make_face()
    extrude(amount=125.83564515898904, mode=Mode.SUBTRACT)


solid = part.part
